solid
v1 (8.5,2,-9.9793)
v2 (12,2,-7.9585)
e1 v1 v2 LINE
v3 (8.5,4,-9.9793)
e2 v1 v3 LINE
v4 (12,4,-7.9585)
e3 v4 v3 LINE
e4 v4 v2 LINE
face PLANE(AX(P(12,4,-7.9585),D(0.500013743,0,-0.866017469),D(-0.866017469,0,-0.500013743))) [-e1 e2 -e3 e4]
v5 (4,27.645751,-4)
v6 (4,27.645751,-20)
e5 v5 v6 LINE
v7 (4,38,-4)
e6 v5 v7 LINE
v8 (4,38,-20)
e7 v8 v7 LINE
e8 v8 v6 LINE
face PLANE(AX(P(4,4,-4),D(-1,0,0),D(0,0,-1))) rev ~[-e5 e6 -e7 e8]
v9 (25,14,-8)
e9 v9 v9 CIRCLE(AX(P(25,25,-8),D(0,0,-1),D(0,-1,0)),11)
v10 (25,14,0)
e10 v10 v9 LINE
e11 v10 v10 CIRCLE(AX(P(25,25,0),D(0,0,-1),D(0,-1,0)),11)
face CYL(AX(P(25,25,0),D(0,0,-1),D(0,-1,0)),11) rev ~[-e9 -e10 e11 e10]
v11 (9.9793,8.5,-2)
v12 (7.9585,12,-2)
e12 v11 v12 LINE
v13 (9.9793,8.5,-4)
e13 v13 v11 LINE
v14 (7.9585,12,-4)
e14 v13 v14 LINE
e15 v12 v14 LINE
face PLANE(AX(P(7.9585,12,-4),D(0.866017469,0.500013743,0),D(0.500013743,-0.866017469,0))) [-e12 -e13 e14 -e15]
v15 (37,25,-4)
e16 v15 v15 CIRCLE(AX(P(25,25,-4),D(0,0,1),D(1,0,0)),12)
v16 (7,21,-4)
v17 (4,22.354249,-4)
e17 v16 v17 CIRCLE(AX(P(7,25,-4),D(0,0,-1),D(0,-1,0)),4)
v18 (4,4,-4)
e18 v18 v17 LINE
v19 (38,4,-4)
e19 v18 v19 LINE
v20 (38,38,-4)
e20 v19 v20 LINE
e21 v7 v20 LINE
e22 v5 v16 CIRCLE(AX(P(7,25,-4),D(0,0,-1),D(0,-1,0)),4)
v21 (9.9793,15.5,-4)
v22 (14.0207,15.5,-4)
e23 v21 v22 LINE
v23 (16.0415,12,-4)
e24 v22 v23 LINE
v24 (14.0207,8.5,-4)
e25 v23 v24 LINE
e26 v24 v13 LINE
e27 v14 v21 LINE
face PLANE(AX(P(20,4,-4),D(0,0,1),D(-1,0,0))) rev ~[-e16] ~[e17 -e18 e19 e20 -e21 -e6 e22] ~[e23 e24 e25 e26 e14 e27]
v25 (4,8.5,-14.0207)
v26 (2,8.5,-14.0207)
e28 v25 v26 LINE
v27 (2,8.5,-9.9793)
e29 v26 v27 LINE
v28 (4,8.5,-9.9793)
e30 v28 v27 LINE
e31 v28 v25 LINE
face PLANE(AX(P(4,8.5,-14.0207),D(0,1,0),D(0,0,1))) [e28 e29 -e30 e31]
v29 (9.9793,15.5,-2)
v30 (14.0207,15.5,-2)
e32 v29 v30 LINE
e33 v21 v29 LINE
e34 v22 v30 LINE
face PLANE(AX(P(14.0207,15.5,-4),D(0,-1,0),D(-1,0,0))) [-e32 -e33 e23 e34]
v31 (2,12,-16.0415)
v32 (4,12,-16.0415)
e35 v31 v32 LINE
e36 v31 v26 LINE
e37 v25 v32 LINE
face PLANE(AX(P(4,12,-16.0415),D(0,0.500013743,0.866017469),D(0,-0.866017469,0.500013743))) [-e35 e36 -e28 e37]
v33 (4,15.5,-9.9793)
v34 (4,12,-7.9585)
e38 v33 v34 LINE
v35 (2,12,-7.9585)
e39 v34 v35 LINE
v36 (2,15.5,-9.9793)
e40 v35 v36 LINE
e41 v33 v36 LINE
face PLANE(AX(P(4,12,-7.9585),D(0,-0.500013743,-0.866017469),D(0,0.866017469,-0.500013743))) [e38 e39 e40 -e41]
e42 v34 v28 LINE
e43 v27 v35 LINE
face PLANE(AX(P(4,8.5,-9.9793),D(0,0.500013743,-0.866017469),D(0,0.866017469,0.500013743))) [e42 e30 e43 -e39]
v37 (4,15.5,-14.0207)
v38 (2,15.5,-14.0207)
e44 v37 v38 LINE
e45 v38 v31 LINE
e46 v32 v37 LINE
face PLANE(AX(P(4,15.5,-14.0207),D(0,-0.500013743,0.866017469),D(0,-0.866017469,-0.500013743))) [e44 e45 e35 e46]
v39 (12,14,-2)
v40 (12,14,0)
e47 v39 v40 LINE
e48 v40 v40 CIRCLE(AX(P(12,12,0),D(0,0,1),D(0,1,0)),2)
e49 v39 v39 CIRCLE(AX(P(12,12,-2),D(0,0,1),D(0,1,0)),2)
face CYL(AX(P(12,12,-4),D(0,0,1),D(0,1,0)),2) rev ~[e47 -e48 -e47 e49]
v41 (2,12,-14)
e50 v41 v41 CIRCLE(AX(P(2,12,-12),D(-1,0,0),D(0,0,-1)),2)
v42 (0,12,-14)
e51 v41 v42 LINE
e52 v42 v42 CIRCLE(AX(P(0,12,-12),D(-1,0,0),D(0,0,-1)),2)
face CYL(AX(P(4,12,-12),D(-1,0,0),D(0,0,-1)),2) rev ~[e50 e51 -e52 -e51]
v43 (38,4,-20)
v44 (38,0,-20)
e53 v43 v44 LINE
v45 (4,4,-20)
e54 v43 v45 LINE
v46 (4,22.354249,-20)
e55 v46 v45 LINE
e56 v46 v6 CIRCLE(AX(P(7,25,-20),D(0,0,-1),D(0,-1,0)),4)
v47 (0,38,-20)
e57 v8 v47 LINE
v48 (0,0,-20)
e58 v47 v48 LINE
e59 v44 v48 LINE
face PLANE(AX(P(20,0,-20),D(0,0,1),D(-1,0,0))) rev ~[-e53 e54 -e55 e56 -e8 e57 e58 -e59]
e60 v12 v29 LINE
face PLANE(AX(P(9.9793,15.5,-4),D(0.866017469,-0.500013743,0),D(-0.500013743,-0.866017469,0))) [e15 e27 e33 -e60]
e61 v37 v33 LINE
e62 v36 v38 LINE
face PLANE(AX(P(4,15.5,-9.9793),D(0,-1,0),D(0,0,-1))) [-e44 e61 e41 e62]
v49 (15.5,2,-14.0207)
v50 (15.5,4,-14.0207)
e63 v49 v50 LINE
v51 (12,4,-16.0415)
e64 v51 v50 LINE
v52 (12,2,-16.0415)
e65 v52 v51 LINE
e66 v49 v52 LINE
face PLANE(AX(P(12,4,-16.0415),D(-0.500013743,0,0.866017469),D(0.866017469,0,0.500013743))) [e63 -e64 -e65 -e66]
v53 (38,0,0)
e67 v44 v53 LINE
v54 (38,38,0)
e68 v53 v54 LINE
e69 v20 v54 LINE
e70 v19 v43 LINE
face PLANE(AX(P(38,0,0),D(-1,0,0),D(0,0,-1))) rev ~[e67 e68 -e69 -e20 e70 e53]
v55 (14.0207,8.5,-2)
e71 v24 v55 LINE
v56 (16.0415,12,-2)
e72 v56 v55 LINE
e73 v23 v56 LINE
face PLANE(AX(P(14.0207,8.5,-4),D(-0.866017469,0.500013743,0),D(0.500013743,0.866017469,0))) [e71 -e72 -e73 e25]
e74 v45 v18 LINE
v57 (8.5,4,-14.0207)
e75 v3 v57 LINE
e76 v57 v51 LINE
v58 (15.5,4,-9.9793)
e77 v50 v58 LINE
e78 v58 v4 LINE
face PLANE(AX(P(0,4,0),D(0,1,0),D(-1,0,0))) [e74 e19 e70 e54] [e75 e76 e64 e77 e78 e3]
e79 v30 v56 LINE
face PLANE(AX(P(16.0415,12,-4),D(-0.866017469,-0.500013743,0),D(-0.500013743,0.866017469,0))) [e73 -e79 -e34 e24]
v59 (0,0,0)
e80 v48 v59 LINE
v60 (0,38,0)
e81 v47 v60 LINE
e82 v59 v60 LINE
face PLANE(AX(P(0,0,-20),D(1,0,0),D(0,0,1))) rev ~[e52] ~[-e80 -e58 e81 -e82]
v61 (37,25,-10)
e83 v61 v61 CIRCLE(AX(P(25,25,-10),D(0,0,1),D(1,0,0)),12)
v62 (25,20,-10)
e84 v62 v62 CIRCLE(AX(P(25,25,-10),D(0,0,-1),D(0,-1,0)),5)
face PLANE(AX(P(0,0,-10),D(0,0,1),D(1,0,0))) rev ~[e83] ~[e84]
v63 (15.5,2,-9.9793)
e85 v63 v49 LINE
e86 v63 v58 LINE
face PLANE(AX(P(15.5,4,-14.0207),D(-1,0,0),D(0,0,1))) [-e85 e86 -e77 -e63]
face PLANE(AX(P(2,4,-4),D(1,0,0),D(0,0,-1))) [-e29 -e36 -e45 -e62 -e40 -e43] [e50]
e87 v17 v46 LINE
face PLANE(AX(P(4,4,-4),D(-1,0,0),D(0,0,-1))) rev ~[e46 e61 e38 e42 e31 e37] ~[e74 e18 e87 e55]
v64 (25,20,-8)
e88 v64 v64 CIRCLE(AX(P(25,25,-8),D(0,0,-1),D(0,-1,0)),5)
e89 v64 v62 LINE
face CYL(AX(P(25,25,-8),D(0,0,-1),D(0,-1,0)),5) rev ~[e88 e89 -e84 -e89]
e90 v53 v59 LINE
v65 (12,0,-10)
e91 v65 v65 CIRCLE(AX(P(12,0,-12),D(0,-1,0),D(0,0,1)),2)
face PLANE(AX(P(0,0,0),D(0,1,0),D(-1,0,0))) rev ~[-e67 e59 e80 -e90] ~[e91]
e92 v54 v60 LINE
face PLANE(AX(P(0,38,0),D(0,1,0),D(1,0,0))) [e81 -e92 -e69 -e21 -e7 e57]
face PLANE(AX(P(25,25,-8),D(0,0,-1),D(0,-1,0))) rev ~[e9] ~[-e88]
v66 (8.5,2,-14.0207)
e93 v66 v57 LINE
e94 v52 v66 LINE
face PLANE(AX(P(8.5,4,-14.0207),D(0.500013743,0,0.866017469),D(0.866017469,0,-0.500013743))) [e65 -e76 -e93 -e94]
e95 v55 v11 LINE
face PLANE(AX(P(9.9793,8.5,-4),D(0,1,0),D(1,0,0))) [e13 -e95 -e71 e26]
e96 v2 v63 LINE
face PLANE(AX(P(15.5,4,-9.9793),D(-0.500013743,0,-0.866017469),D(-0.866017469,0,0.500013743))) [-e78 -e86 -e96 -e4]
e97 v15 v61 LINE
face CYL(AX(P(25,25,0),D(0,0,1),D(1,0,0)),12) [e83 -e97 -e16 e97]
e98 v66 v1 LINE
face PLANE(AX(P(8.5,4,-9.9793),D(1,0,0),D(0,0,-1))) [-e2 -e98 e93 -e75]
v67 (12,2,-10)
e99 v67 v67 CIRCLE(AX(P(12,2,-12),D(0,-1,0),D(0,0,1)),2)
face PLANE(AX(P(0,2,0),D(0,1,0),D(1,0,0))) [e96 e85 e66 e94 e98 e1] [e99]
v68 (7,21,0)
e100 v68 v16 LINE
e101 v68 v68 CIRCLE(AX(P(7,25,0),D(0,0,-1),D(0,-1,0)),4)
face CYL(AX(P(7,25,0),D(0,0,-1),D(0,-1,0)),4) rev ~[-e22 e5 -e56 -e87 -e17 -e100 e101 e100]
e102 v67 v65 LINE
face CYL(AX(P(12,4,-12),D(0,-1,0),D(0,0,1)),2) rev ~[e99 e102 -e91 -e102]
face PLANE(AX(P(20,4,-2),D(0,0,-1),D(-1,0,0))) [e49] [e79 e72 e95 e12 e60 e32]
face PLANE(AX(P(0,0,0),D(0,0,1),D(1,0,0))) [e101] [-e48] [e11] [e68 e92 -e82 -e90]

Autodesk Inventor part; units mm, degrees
ref_plane "YZ Plane" through (0, 0, 0) normal (1, 0, 0) x (0, 1, 0)
ref_plane "XZ Plane" through (0, 0, 0) normal (0, 1, 0) x (-1, 0, 0)
ref_plane "XY Plane" through (0, 0, 0) normal (0, 0, 1) x (1, 0, 0)
sketch "Sketch1" plane through (0, 0, 0) normal (0, 1, 0) x (-1, 0, 0)
  line L0 (0, 0) -> (-20, 0)
  line L1 (-20, 0) -> (-20, -20)
  line L2 (-20, -20) -> (0, -20)
  line L3 (0, -20) -> (0, 0)
  dimension "d0" = 20
  dimension "d1" = 20
extrude "Extrusion1" add sketch "Sketch1" along normal blind 4
sketch "Sketch2" plane through (0, 4, 0) normal (0, 1, 0) x (1, 0, 0)
  line L0 (0, 0) -> (20, 0)
  line L1 (20, 0) -> (20, 4)
  line L2 (20, 4) -> (4, 4)
  line L3 (0, 4) -> (0, 0)
  line L4 (0, 0) -> (4, 0)
  line L5 (4, 20) -> (0, 20)
  line L6 (0, 20) -> (0, 0)
  line L7 (4, 4) -> (4, 20)
  line L8 (0, 0) -> (20, 0) projected
  line L9 (0, 0) -> (20, 0)
  line L10 (0, 20) -> (0, 0) projected
  line L11 (0, 0) -> (0, 20)
extrude "Extrusion2" add sketch "Sketch2" along normal blind 16
hole "Hole2" at (12, 12, -4) direction (0, 0, 1) diameter 4 end through all
hole "Hole3" at (4, 12, -12) direction (-1, 0, 0) diameter 4 end through all
hole "Hole4" at (12, 4, -12) direction (0, -1, 0) diameter 4 end through all
sketch "Sketch3" plane through (20, 4, -4) normal (0, 0, -1) x (-1, 0, 0)
  line L0 (12.0415, 8) -> (10.0207, 4.5)
  line L1 (10.0207, 4.5) -> (5.9793, 4.5)
  line L2 (5.9793, 4.5) -> (3.9585, 8)
  line L3 (3.9585, 8) -> (5.9793, 11.5)
  line L4 (5.9793, 11.5) -> (10.0207, 11.5)
  line L5 (10.0207, 11.5) -> (12.0415, 8)
  point P0 (20, -4)
  point P1 (8, 8)
  dimension "d51" = 7
sketch "Sketch4" plane through (4, 4, -4) normal (1, 0, 0) x (0, 0, -1)
  line L0 (12.0415, 8) -> (10.0207, 4.5)
  line L1 (10.0207, 4.5) -> (5.9793, 4.5)
  line L2 (5.9793, 4.5) -> (3.9585, 8)
  line L3 (3.9585, 8) -> (5.9793, 11.5)
  line L4 (5.9793, 11.5) -> (10.0207, 11.5)
  line L5 (10.0207, 11.5) -> (12.0415, 8)
  point P0 (-4, -4)
  point P1 (8, 8)
  dimension "d52" = 7
sketch "Sketch5" plane through (0, 4, 0) normal (0, 1, 0) x (1, 0, 0)
  circle A0 centre (12, 12) radius 2 projected
  line L0 (12, 7.9585) -> (8.5, 9.9793)
  line L1 (8.5, 9.9793) -> (8.5, 14.0207)
  line L2 (8.5, 14.0207) -> (12, 16.0415)
  line L3 (12, 16.0415) -> (15.5, 14.0207)
  line L4 (15.5, 14.0207) -> (15.5, 9.9793)
  line L5 (15.5, 9.9793) -> (12, 7.9585)
  point P0 (0, 0)
  dimension "d53" = 7
extrude "Extrusion3" cut sketch "Sketch3" against normal blind 2
extrude "Extrusion4" cut sketch "Sketch4" against normal blind 2
extrude "Extrusion5" cut sketch "Sketch5" against normal blind 2
sketch "Sketch6" plane through (0, 0, 0) normal (0, 0, 1) x (1, 0, 0)
  circle A0 centre (25, 25) radius 12
  point P0 (0, 0)
  point P1 (7, 25)
  dimension "d92" = 24
thicken "Thicken3" operation add thickness 18 both sides no extend neighbours yes toward (0, 1, 0) faces at (1.3333, 20, -8)
thicken "Thicken4" operation add thickness 18 both sides no extend neighbours yes toward (1, 0, 0) faces at (20, 14, -1.3333)
hole "Hole5" at (7, 25, 0) direction (0, 0, -1) diameter 8 end through all
extrude "Extrusion6" add sketch "Sketch6" against normal blind 10
hole "Hole7" at (25, 25, 0) direction (0, 0, -1) diameter 10 end through all counterbore diameter 22 counterbore depth 8
properties part number "Frame3WayBlockMotor" material "PLA Orange"
